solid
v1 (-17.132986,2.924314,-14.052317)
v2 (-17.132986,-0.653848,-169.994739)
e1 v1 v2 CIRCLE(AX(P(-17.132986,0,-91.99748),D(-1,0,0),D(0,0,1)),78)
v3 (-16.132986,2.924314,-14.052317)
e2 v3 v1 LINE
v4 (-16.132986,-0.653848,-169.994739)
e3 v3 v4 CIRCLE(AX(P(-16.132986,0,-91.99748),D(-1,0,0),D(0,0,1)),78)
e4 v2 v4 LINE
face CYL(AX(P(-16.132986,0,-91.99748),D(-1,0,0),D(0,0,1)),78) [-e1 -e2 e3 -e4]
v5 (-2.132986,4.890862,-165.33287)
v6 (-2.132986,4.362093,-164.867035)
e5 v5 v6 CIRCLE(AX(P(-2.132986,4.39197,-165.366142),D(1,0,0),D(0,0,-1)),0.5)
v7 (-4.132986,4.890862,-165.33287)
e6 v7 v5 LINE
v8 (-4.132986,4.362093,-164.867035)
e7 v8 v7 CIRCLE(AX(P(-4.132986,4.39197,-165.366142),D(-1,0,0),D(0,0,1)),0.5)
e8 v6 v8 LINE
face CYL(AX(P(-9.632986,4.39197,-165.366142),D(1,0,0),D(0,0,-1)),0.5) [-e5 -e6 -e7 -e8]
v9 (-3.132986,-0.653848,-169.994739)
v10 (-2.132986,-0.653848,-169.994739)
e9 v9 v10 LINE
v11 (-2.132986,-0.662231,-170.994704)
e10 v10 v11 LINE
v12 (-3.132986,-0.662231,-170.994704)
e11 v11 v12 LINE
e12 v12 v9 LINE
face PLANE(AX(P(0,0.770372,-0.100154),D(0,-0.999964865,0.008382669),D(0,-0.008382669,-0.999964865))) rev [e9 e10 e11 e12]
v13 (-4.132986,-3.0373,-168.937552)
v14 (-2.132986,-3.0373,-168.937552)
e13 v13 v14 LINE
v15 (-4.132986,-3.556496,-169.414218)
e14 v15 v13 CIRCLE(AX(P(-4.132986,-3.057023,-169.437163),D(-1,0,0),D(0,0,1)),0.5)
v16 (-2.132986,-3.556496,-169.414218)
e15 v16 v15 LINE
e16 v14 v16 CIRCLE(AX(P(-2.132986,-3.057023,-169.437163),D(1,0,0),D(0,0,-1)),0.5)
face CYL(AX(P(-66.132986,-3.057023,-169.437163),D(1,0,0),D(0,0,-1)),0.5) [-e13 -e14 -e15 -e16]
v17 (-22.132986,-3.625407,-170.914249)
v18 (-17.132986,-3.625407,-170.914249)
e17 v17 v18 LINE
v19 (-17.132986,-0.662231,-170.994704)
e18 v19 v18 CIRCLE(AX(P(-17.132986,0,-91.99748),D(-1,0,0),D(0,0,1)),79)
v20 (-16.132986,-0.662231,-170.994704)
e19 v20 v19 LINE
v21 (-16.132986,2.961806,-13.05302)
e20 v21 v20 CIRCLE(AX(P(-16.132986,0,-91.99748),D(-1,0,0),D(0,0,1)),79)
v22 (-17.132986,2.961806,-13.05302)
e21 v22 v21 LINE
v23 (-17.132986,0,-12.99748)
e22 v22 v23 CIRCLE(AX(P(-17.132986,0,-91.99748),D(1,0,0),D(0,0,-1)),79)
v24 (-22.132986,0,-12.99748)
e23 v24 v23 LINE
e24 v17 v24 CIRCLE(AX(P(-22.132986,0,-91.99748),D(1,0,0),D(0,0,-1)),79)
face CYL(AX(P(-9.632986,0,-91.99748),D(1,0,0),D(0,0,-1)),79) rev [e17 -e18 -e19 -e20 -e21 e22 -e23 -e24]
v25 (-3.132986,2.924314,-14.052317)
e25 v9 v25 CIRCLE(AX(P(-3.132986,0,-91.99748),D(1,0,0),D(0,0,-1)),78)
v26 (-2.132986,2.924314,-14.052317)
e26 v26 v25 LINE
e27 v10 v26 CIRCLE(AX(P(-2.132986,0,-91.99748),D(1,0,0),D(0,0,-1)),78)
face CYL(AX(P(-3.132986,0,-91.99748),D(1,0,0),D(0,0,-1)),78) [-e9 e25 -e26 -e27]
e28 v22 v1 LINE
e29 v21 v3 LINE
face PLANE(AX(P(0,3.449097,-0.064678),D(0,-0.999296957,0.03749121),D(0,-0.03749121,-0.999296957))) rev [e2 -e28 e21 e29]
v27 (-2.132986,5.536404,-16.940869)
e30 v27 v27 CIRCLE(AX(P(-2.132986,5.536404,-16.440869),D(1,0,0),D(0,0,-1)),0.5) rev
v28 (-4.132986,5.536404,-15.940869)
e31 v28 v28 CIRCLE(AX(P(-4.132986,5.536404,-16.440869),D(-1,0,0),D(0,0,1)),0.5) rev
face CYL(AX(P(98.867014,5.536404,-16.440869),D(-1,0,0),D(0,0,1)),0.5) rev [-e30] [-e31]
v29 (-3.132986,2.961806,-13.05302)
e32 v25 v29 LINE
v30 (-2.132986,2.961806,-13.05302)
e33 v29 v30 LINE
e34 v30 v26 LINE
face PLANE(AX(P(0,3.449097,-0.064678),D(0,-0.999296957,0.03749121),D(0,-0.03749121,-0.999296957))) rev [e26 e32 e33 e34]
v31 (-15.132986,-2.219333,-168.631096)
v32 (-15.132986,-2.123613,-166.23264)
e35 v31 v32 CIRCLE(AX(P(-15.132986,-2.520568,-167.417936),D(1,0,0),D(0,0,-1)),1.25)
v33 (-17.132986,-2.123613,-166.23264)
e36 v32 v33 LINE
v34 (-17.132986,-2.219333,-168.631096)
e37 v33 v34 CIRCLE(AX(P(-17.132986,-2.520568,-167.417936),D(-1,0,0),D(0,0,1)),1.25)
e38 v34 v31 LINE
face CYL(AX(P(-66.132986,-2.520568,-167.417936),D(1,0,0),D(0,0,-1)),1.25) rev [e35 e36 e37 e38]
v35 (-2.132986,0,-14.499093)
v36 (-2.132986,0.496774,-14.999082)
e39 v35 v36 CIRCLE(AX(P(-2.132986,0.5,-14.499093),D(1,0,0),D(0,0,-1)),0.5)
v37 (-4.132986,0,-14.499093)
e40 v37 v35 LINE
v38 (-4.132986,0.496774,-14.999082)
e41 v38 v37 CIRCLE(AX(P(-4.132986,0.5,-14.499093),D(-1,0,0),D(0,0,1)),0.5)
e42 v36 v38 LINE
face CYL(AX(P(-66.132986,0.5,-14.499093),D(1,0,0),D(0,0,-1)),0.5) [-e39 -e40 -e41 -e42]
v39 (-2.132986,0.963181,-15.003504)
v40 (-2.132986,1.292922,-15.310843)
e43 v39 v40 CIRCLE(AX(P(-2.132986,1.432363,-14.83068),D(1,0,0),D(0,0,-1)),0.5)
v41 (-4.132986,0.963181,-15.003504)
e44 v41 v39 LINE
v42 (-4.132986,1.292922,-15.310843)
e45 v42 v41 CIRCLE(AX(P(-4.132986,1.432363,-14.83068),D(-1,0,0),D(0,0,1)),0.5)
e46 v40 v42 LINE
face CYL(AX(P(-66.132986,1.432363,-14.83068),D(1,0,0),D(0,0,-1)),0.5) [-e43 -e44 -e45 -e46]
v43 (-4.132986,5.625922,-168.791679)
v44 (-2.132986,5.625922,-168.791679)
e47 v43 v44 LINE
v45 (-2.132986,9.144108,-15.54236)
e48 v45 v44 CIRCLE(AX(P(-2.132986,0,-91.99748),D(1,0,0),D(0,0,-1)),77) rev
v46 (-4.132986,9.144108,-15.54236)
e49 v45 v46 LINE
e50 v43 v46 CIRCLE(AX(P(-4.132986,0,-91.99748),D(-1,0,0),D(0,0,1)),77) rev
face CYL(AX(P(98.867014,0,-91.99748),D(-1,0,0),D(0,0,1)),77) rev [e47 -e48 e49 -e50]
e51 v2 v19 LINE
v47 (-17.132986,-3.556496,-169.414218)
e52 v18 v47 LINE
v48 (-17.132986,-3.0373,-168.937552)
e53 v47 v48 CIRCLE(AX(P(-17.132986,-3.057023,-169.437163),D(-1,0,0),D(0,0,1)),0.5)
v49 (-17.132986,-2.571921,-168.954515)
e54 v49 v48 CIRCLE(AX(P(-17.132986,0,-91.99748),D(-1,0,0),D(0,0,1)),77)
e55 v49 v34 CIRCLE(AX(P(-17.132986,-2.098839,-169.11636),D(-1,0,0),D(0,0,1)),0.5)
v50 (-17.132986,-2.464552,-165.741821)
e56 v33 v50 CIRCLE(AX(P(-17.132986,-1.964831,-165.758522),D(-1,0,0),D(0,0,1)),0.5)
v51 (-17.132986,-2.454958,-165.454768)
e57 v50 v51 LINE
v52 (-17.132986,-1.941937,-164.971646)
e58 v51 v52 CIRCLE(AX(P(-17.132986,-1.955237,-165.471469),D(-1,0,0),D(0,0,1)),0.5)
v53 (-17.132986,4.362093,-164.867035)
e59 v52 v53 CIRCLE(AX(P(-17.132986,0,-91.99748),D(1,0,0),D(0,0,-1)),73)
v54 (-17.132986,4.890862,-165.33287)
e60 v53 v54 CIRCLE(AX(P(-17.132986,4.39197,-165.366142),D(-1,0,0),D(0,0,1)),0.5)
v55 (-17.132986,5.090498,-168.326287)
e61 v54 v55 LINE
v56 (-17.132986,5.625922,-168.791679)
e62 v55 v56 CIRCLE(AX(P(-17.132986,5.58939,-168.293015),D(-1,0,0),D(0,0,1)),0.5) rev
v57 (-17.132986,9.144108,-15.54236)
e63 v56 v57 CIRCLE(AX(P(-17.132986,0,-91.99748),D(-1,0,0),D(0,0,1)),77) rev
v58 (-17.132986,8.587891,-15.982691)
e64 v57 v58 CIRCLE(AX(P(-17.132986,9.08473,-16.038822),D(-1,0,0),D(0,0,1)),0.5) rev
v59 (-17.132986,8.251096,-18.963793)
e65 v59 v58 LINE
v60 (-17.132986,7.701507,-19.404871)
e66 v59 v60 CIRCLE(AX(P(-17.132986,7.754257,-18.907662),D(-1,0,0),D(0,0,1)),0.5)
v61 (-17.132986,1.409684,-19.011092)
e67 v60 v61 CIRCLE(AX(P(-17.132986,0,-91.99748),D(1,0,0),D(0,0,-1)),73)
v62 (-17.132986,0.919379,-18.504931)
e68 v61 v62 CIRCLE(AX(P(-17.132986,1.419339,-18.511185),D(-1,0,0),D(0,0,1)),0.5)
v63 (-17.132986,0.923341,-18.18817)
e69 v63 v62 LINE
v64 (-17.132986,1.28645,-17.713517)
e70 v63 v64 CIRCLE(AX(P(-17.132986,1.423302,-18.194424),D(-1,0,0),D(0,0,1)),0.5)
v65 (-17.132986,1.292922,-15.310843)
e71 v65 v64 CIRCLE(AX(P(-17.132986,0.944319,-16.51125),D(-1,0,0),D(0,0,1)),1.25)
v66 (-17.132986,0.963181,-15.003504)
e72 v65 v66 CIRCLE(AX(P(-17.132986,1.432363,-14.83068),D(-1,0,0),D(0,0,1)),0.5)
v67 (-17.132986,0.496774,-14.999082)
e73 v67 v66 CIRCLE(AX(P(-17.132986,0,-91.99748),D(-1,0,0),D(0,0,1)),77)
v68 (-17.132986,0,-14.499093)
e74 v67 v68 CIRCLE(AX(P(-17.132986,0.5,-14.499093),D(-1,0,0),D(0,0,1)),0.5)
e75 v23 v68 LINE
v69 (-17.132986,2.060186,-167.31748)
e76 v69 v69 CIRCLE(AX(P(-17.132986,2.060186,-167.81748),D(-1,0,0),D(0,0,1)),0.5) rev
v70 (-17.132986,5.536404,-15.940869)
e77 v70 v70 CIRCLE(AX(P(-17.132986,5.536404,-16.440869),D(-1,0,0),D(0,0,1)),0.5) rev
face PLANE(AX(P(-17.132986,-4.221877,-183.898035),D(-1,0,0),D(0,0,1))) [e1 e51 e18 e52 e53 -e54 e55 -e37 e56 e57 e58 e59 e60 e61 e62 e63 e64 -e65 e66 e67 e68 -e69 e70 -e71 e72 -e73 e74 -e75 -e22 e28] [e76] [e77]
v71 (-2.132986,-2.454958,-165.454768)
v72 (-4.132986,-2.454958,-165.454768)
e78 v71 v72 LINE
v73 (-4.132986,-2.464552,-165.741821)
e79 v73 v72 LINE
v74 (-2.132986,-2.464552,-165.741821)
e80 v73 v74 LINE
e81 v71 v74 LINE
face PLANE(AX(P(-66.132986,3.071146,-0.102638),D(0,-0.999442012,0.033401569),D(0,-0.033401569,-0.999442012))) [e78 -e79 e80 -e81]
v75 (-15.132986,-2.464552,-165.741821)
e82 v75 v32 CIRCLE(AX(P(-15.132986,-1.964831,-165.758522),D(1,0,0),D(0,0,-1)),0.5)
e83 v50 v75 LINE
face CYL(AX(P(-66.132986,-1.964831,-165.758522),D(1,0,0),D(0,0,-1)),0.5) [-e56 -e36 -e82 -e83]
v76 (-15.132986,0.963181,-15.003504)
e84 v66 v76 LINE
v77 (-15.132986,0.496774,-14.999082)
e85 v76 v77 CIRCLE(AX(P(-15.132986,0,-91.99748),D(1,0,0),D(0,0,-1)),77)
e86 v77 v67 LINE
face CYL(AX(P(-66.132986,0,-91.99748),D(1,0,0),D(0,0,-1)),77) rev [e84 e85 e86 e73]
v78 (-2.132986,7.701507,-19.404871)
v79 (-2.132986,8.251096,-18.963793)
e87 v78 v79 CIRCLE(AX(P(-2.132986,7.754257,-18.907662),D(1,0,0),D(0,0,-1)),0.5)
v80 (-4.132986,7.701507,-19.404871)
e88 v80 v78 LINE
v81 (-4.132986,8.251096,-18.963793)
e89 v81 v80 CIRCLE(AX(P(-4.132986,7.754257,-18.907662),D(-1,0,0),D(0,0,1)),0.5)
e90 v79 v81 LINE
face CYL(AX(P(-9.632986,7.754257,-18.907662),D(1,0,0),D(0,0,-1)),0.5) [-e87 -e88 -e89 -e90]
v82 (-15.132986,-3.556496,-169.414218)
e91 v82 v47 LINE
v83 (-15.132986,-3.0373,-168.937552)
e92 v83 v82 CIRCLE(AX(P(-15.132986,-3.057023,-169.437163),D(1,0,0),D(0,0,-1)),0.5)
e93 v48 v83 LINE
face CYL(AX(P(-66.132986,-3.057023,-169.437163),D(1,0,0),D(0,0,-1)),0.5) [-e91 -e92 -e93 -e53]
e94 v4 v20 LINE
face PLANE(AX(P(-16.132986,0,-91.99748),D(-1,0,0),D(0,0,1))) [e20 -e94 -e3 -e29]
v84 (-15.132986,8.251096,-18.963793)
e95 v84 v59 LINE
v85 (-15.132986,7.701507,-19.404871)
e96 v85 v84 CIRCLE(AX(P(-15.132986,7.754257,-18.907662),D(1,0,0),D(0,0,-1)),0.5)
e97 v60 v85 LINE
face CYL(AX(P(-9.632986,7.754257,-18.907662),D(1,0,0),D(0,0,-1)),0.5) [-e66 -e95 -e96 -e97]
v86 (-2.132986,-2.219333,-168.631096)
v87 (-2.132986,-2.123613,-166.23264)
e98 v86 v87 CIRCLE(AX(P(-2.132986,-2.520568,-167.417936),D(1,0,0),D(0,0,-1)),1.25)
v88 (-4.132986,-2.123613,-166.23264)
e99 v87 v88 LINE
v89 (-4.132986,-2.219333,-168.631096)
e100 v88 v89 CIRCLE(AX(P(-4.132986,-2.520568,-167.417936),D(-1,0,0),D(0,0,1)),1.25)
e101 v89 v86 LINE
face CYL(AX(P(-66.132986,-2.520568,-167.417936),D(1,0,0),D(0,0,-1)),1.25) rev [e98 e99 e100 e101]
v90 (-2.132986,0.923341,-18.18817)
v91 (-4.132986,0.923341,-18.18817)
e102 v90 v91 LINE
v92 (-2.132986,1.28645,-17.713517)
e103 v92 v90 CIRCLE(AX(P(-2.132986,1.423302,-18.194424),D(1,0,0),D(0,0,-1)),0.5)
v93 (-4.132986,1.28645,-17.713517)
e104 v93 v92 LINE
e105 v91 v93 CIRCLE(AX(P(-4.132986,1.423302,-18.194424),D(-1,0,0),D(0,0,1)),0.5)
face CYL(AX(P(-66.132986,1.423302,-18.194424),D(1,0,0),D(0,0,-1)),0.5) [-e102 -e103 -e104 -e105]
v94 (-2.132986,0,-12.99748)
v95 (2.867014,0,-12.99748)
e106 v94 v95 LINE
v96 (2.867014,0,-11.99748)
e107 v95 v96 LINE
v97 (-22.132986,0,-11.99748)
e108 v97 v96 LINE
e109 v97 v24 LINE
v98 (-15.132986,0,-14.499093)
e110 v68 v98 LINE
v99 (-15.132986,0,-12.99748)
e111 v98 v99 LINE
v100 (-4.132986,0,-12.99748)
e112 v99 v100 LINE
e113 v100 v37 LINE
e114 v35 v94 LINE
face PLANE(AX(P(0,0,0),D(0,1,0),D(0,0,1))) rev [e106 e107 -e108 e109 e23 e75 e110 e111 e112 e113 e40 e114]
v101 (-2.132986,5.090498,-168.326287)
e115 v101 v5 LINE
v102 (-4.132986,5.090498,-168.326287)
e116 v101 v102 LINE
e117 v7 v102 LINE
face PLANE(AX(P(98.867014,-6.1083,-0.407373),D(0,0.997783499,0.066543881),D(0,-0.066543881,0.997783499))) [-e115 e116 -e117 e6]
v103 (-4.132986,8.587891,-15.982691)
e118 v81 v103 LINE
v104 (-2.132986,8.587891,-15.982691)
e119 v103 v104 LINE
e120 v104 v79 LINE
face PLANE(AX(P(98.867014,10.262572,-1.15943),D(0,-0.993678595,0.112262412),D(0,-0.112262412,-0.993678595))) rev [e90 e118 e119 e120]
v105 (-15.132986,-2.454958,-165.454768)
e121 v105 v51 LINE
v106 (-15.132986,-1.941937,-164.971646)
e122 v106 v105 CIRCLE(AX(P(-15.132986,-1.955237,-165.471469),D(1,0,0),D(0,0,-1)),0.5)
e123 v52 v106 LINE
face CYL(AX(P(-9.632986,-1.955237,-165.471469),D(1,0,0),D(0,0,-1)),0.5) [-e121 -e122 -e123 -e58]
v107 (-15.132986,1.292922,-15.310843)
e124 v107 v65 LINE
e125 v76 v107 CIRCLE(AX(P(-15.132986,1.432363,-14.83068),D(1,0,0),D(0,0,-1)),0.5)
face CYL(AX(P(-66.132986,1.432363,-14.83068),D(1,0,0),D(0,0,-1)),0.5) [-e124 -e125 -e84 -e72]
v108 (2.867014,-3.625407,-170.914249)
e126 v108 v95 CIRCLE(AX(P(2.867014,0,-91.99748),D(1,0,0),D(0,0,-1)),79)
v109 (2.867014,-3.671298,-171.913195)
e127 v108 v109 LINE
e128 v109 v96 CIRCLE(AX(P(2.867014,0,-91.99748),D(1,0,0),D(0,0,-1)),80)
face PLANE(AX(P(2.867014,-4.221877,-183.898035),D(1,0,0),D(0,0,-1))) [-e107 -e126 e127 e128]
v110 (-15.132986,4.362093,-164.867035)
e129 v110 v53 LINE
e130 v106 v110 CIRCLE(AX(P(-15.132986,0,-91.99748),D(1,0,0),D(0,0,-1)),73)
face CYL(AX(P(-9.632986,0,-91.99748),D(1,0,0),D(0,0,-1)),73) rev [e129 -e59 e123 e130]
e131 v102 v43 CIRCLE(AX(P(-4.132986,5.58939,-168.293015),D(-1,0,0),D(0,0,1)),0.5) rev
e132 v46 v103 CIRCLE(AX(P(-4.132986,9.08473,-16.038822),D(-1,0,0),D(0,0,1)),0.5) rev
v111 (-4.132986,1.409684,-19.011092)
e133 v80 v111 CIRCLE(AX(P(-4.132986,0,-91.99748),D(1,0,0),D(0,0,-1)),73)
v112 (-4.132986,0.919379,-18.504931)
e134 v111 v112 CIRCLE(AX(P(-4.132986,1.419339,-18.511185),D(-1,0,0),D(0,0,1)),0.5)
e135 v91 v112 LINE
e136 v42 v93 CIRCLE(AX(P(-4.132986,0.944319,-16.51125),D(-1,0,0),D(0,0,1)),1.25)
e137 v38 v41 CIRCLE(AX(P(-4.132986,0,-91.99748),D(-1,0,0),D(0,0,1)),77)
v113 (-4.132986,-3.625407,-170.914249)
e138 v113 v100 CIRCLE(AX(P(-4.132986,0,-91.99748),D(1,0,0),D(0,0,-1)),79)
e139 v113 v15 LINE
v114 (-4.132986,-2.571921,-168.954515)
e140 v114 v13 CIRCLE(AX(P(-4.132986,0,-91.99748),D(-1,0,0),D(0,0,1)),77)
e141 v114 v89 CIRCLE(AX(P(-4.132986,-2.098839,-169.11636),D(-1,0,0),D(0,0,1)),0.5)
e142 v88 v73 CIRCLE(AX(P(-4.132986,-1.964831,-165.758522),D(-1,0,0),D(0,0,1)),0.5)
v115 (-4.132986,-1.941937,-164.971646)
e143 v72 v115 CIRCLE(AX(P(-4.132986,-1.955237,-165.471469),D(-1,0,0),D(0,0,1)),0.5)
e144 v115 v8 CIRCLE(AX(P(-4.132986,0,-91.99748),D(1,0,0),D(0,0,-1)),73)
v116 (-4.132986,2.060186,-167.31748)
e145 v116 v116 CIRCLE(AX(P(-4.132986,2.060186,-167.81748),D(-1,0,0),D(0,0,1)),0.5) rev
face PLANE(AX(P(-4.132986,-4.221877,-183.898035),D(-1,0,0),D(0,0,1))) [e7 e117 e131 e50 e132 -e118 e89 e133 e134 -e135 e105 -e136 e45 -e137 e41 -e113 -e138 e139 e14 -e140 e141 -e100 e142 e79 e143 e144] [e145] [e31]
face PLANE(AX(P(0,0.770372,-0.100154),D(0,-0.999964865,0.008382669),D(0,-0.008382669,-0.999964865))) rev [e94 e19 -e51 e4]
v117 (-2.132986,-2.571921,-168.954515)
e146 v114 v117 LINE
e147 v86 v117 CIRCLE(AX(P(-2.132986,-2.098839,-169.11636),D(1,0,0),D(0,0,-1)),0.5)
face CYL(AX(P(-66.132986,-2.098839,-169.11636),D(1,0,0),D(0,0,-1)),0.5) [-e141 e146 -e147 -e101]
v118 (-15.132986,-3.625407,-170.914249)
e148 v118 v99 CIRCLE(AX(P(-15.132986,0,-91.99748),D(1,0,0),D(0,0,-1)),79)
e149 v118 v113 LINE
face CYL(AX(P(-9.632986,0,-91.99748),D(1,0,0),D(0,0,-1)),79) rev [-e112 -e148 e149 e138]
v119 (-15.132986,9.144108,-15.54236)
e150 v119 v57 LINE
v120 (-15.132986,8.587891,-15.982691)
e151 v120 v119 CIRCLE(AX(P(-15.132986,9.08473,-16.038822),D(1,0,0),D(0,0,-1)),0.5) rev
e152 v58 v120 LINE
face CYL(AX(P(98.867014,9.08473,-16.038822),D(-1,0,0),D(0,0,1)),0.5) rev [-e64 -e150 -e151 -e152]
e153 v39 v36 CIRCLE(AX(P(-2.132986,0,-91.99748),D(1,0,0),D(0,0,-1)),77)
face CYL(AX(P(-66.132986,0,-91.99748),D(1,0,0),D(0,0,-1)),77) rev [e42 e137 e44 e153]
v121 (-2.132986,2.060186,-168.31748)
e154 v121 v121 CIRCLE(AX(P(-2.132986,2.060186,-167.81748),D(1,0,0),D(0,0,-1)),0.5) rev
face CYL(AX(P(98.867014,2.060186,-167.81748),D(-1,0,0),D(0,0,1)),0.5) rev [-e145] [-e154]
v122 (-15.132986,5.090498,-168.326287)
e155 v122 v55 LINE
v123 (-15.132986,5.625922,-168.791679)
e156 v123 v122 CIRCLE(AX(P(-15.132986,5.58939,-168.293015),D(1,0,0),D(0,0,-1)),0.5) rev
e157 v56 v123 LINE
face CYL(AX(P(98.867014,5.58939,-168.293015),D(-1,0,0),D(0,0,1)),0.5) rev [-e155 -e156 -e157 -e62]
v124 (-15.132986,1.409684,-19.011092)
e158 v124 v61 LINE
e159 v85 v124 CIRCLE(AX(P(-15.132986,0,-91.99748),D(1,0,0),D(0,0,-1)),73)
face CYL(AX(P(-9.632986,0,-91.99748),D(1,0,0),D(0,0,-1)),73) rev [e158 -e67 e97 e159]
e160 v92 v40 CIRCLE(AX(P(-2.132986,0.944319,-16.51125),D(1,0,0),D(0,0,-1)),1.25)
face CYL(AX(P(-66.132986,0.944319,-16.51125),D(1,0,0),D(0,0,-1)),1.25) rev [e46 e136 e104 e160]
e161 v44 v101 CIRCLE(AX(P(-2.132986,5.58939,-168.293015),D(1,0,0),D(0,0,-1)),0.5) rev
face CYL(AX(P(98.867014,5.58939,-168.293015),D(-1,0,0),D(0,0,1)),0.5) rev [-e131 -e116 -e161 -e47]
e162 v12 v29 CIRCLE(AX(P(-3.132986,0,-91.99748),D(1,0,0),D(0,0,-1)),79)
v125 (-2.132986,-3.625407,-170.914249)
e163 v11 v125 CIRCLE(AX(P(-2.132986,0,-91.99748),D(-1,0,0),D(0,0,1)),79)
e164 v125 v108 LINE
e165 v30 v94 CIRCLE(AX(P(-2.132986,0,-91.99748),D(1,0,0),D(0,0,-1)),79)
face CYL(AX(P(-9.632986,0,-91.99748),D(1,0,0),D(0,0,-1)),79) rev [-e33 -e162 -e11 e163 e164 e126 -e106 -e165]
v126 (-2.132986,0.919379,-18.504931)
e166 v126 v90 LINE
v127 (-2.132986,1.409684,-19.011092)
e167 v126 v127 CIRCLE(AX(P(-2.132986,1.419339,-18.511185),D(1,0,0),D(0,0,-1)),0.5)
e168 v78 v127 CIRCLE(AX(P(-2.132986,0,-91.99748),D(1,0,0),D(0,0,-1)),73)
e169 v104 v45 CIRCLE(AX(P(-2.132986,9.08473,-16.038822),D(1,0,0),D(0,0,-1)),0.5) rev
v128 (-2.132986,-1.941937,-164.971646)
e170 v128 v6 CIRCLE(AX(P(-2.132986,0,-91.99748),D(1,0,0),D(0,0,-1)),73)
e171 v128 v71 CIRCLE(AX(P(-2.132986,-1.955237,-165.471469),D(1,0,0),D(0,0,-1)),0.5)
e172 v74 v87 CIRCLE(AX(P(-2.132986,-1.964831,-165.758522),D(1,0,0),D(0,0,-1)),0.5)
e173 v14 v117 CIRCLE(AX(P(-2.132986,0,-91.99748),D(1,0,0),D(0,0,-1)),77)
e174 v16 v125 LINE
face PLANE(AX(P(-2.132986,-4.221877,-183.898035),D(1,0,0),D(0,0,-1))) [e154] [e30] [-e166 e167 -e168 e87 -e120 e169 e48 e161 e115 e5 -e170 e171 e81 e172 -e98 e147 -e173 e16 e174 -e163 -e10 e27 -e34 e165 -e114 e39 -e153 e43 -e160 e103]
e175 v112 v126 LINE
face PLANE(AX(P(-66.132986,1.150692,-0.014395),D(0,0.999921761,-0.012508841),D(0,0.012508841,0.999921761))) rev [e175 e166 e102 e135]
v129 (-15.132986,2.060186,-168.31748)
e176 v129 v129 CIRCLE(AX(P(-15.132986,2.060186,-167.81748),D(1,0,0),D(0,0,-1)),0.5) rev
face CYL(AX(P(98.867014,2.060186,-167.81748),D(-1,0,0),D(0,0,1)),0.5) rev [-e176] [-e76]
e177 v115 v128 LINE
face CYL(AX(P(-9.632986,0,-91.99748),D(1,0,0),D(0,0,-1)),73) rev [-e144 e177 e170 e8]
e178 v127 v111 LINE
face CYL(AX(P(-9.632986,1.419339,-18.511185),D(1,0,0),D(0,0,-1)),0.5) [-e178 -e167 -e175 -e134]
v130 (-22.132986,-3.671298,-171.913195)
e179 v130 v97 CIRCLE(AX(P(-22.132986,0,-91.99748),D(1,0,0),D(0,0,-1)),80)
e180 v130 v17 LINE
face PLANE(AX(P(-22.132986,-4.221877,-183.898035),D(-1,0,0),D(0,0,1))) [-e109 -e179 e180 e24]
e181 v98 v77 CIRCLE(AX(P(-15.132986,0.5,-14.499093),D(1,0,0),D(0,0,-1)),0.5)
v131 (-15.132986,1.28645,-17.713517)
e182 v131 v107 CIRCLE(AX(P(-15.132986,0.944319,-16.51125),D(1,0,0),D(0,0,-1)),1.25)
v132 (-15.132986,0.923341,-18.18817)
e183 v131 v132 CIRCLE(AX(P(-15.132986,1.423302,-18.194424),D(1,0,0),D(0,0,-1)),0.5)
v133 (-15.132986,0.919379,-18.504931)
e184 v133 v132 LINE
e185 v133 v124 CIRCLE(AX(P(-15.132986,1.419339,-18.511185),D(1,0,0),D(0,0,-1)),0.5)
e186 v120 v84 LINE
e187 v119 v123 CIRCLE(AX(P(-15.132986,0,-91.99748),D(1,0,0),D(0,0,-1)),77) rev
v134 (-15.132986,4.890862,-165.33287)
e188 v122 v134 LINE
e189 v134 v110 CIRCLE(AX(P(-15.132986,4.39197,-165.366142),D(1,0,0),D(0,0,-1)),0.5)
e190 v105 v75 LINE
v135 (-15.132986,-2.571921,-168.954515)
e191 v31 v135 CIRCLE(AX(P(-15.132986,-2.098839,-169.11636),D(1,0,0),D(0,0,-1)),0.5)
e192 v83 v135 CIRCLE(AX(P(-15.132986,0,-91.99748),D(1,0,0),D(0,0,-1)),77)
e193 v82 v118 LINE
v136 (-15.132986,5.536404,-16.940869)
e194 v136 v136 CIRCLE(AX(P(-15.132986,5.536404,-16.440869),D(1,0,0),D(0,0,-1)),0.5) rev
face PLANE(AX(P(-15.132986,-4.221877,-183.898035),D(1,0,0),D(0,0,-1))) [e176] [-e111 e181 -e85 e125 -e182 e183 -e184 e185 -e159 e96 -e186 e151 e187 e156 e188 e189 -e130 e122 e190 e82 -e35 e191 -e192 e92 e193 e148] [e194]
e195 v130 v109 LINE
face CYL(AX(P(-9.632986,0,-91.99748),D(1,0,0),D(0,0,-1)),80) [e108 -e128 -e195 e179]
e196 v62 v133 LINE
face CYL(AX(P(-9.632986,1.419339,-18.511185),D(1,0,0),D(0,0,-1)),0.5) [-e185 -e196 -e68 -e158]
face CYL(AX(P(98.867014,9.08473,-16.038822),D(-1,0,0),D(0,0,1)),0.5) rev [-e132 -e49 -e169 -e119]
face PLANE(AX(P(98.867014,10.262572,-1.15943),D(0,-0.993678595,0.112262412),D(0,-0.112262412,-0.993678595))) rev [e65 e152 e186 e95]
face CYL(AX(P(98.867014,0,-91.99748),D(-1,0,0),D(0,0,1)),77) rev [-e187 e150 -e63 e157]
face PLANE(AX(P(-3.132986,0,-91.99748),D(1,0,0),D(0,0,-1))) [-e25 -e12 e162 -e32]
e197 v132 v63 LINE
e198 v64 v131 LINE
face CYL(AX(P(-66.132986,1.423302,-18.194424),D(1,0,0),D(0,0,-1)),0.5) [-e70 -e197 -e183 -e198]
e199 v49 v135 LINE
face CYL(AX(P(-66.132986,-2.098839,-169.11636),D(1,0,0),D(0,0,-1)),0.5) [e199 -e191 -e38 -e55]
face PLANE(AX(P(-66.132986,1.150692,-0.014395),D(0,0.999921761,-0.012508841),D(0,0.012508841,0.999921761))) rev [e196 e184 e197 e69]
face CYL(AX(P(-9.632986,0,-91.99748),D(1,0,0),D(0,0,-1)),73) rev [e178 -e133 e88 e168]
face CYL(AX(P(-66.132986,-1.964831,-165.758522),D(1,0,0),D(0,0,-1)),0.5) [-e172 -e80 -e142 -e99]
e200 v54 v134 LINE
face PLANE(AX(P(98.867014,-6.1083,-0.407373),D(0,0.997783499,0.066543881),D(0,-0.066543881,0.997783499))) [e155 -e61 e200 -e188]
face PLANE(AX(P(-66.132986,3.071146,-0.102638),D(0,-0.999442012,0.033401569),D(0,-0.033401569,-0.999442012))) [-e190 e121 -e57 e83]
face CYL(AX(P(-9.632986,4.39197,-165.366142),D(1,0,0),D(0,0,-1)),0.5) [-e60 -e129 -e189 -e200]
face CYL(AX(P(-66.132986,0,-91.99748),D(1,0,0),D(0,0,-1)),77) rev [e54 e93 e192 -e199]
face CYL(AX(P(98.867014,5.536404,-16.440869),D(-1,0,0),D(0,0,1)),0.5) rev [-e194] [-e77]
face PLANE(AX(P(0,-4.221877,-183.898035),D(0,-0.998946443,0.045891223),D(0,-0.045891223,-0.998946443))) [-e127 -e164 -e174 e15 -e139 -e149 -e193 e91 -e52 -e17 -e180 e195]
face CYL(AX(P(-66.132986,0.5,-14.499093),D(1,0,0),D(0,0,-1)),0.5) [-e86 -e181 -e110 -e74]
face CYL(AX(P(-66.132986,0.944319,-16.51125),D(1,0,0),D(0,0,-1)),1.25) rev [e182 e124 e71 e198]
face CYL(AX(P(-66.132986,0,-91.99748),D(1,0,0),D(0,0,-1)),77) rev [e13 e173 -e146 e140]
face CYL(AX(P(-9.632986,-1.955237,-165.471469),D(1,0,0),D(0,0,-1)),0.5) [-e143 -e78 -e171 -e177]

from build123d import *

# Parameters (mm, degrees)
CROQUIS2_W                 = 2
CROQUIS2_H                 = 6
REVOLUCI_N1_ANGLE          = 182.6302972
CORTAR_EXTRUIR2_DEPTH      = 101
CORTAR_EXTRUIR2_DEPTH_BACK = 64
CROQUIS3_R                 = 0.5
REDONDEO1_R                = 0.5
REDONDEO2_R                = 0.5
CORTAR_EXTRUIR4_START      = -1
CROQUIS5_R                 = 79
CROQUIS5_R_2               = 78
CORTAR_EXTRUIR4_DEPTH      = 1
CROQUIS6_R                 = 79
CROQUIS6_R_2               = 78
CORTAR_EXTRUIR5_DEPTH      = 1
CROQUIS7_W                 = 1
CROQUIS7_H                 = 1
REVOLUCI_N2_ANGLE          = 2.14859164
CROQUIS8_W                 = 1
CROQUIS8_H                 = 1
REVOLUCI_N4_ANGLE          = 2.15


with BuildPart() as part:
    # Croquis2 → Revolución1 (revolve)
    with BuildSketch(Plane(origin=(0, 0, 0), x_dir=(1, 0, 0), z_dir=(0, 1, 0))):
        Polygon((-9.632985998, 12.997479648), (-9.632985998, 11.997479648), (2.867014002, 11.997479648), (2.867014002, 12.997479648), (-2.132985998, 12.997479648), (-4.132985998, 12.997479648), align=None)
        Polygon((-22.132985998, 12.997479648), (-22.132985998, 11.997479648), (-9.632985998, 11.997479648), (-9.632985998, 12.997479648), (-15.132985998, 12.997479648), (-17.132985998, 12.997479648), align=None)
        with Locations((-16.132985998, 15.997479648)):
            Rectangle(CROQUIS2_W, CROQUIS2_H)
        with Locations((-3.132985998, 15.997479648)):
            Rectangle(CROQUIS2_W, CROQUIS2_H)
    revolve(axis=Axis((-9.632985998, 0, -91.997479648), (-1, 0, 0)), revolution_arc=REVOLUCI_N1_ANGLE)

    # Croquis3 → Cortar-Extruir2 (cut, two sides: drawn at the far end of the back side and taken through both)
    with BuildSketch(Plane(origin=(-2.132985998, 0, 0), x_dir=(0, 0, -1), z_dir=(1, 0, 0)).offset(-CORTAR_EXTRUIR2_DEPTH_BACK)):
        with BuildLine():
            ThreePointArc((168.916355745, -3.533624195), (168.93693777, -3.052832115), (168.954514567, -2.571920792))
            Line((168.954514567, -2.571920792), (168.667238596, -2.562319967))
            ThreePointArc((168.667238596, -2.562319967), (167.459688042, -1.271265491), (166.168633566, -2.478816045))
            Line((166.168633566, -2.478816045), (164.956746519, -2.438314517))
            ThreePointArc((164.956746519, -2.438314517), (164.940082803, -2.894243433), (164.920569974, -3.350059302))
            Line((164.920569974, -3.350059302), (168.916355745, -3.533624195))
        make_face()
        with BuildLine():
            ThreePointArc((15.003504022, 0.963180773), (14.998985756, 0.481599807), (14.997479648, 0))
            Line((14.997479648, 0), (18.997479648, 0))
            ThreePointArc((18.997479648, 0), (18.998907517, 0.456581635), (19.003191067, 0.913145409))
            Line((19.003191067, 0.913145409), (17.761151954, 0.928683094))
            ThreePointArc((17.761151954, 0.928683094), (16.526885803, 2.194221348), (15.26134755, 0.959955197))
            Line((15.26134755, 0.959955197), (15.003504022, 0.963180773))
        make_face()
        with Locations(Location((167.817479648, 2.060185692, 0), (0, 0, 180))):
            Circle(CROQUIS3_R)
        with Locations(Location((16.440869241, 5.536404348, 0), (0, 0, 180))):
            Circle(CROQUIS3_R)
        with BuildLine():
            ThreePointArc((168.826809108, 5.123878873), (93.764723702, 76.979717124), (15.484227806, 8.644205721))
            Line((15.484227806, 8.644205721), (19.458942188, 8.195156073))
            ThreePointArc((19.458942188, 8.195156073), (93.672918816, 72.98077078), (164.835675111, 4.857703347))
            Line((164.835675111, 4.857703347), (168.826809108, 5.123878873))
        make_face()
    extrude(amount=CORTAR_EXTRUIR2_DEPTH + CORTAR_EXTRUIR2_DEPTH_BACK, mode=Mode.SUBTRACT)

    # Redondeo1
    # the kernel refuses this fillet: 0.5 mm, written as the material it adds along each edge
    with BuildSketch(Plane(origin=(-17.132985998, 5.123878873, -168.826809108), x_dir=(0, -0.06654388147144101, 0.9977834994820844), z_dir=(1, 0, 0)), Plane(origin=(-4.132985998, 5.123878873, -168.826809108), x_dir=(0, -0.06654388147144101, 0.9977834994820844), z_dir=(1, 0, 0))) as redondeo1_piece_1:
        with BuildLine():
            CenterArc((0.501634004, -0.5), REDONDEO1_R, 90, 90.374484885)
            ThreePointArc((0.001644684, -0.503267974), (0.000411172, -0.251635331), (0, 0))
            Line((0, 0), (0.501634004, 0))
        make_face()
    extrude(amount=2)
    # the kernel refuses this fillet: 0.5 mm, written as the material it takes off along each edge
    with BuildSketch(Plane(origin=(-18.378734248, 4.857703347, -164.835675111), x_dir=(0, -0.9980040686356455, -0.06314965547568487), z_dir=(1, 0, 0)), Plane(origin=(-5.378734248, 4.857703347, -164.835675111), x_dir=(0, -0.9980040686356455, -0.06314965547568487), z_dir=(1, 0, 0))) as redondeo1_2_piece_1:
        with BuildLine():
            CenterArc((0.498302202, 0.499997108), REDONDEO1_R, 180.194885107, 89.610229786)
            Line((-0.001694905, 0.498296418), (0, 0))
            ThreePointArc((0, 0), (0.248300756, 0.000422284), (0.496601512, 0))
        make_face()
    extrude(amount=4.4914965, mode=Mode.SUBTRACT)
    with BuildSketch(Plane(origin=(-5.378953698, -3.533624195, -168.916355745), x_dir=(0, -0.045891223305881, -0.9989464428203795), z_dir=(1, 0, 0)), Plane(origin=(-18.378953698, -3.533624195, -168.916355745), x_dir=(0, -0.045891223305881, -0.9989464428203795), z_dir=(1, 0, 0))) as redondeo1_2_piece_2:
        with BuildLine():
            CenterArc((0.49838708, 0.5), REDONDEO1_R, 180.369652755, 89.630347245)
            ThreePointArc((-0.001602514, 0.496774194), (-0.00040063, 0.248388389), (0, 0))
            Line((0, 0), (0.49838708, 0))
        make_face()
    extrude(amount=4.4919354, mode=Mode.SUBTRACT)
    with BuildSketch(Plane(origin=(-14.06535854, -2.478816045, -166.168633566), x_dir=(0, 0.9841495238599837, -0.17734067408851076), z_dir=(-1, 0, 0)), Plane(origin=(-1.06535854, -2.478816045, -166.168633566), x_dir=(0, 0.9841495238599838, -0.17734067408851054), z_dir=(-1, 0, 0))) as redondeo1_2_piece_3:
        with BuildLine():
            CenterArc((0.433108746, -0.494761918), REDONDEO1_R, 98.3007748, 73.398450401)
            Line((-0.061653172, -0.422577127), (0, 0))
            ThreePointArc((0, 0), (0.180461978, -0.013095204), (0.360923955, 0))
        make_face()
    extrude(amount=4.135254916, mode=Mode.SUBTRACT)
    with BuildSketch(Plane(origin=(-17.995200064, -2.562319967, -168.667238596), x_dir=(0, -0.033401568724359246, -0.9994420119280317), z_dir=(1, 0, 0)), Plane(origin=(-4.995200064, -2.562319967, -168.667238596), x_dir=(0, -0.033401568724359246, -0.9994420119280317), z_dir=(1, 0, 0))) as redondeo1_2_piece_4:
        with BuildLine():
            CenterArc((0.433390187, 0.478223253), REDONDEO1_R, 195.858969576, 57.168831014)
            ThreePointArc((-0.047578438, 0.341588038), (-0.011951747, 0.172442813), (0, 0))
            Line((0, 0), (0.287436357, 0))
        make_face()
    extrude(amount=3.724428132, mode=Mode.SUBTRACT)
    with BuildSketch(Plane(origin=(-13.887237748, -2.438314517, -164.956746519), x_dir=(0, -0.03340156872588579, -0.9994420119279808), z_dir=(-1, 0, 0)), Plane(origin=(-0.887237748, -2.438314517, -164.956746519), x_dir=(0, -0.03340156872588579, -0.9994420119279808), z_dir=(-1, 0, 0))) as redondeo1_2_piece_5:
        with BuildLine():
            CenterArc((0.4982993, -0.5), REDONDEO1_R, 90, 89.610229786)
            ThreePointArc((-0.001689131, -0.496598639), (-0.000422284, -0.248300756), (0, 0))
            Line((0, 0), (0.4982993, 0))
        make_face()
    extrude(amount=4.4914965, mode=Mode.SUBTRACT)

    # Redondeo2
    # the kernel refuses this fillet: 0.5 mm, written as the material it adds along each edge
    with BuildSketch(Plane(origin=(-15.132985998, 8.644205721, -15.484227806), x_dir=(0, 0.9933064166232053, -0.11550914550444648), z_dir=(-1, 0, 0)), Plane(origin=(-2.132985998, 8.644205721, -15.484227806), x_dir=(0, 0.9933064166232053, -0.11550914550444648), z_dir=(-1, 0, 0))) as redondeo2_piece_1:
        with BuildLine():
            CenterArc((0.501636666, 0.49999733), REDONDEO2_R, 179.812757557, 90.374484885)
            Line((0.001639336, 0.501631326), (0, 0))
            ThreePointArc((0, 0), (0.251635331, -0.000411172), (0.503270661, 0))
        make_face()
    extrude(amount=2)
    # the kernel refuses this fillet: 0.5 mm, written as the material it takes off along each edge
    with BuildSketch(Plane(origin=(-5.378953698, 0, -14.997479648), x_dir=(0, 0, 1), z_dir=(1, 0, 0)), Plane(origin=(-18.378953698, 0, -14.997479648), x_dir=(0, 0, 1), z_dir=(1, 0, 0))) as redondeo2_2_piece_1:
        with BuildLine():
            CenterArc((0.49838708, -0.5), REDONDEO2_R, 90, 89.630347245)
            ThreePointArc((-0.001602514, -0.496774194), (-0.00040063, -0.248388389), (0, 0))
            Line((0, 0), (0.49838708, 0))
        make_face()
    extrude(amount=4.4919354, mode=Mode.SUBTRACT)
    with BuildSketch(Plane(origin=(-14.291422485, 0.959955197, -15.26134755), x_dir=(0, 0.0125088412135749, 0.9999217613851065), z_dir=(-1, 0, 0))) as redondeo2_2_piece_2:
        with BuildLine():
            CenterArc((0.436542668, 0.466983755), REDONDEO2_R, 195.476781903, 53.585192252)
            ThreePointArc((-0.045326665, 0.333559825), (-0.0113835, 0.168312703), (0, 0))
            Line((0, 0), (0.257863703, 0))
        make_face()
    extrude(amount=3.683127026, mode=Mode.SUBTRACT)
    with BuildSketch(Plane(origin=(-14.06535854, 0.928683094, -17.761151954), x_dir=(0, 0.9912523140828179, 0.13198049032133008), z_dir=(-1, 0, 0))) as redondeo2_2_piece_3:
        with BuildLine():
            CenterArc((0.433108746, 0.494761918), REDONDEO2_R, 188.300774799, 73.398450401)
            Line((-0.061653172, 0.422577127), (0, 0))
            ThreePointArc((0, 0), (0.180461978, 0.013095204), (0.360923955, 0))
        make_face()
    extrude(amount=4.135254916, mode=Mode.SUBTRACT)
    with BuildSketch(Plane(origin=(-13.887237748, 0.913145409, -19.003191067), x_dir=(0, 0.012508841212886753, 0.9999217613851149), z_dir=(-1, 0, 0))) as redondeo2_2_piece_4:
        with BuildLine():
            CenterArc((0.4982993, 0.5), REDONDEO2_R, 180.389770214, 89.610229786)
            ThreePointArc((-0.001689131, 0.496598639), (-0.000422284, 0.248300756), (0, 0))
            Line((0, 0), (0.4982993, 0))
        make_face()
    extrude(amount=4.4914965, mode=Mode.SUBTRACT)
    with BuildSketch(Plane(origin=(-1.291422485, 0.959955197, -15.26134755), x_dir=(0, 0.9891313564110952, -0.1470345529606798), z_dir=(-1, 0, 0))) as redondeo2_2_piece_5:
        with BuildLine():
            CenterArc((0.403950486, -0.4954466), REDONDEO2_R, 97.738390952, 53.585192252)
            Line((-0.034721389, -0.25551539), (0, 0))
            ThreePointArc((0, 0), (0.168312703, -0.0113835), (0.336625405, 0))
        make_face()
    extrude(amount=3.683127026, mode=Mode.SUBTRACT)
    with BuildSketch(Plane(origin=(-1.06535854, 0.928683094, -17.761151954), x_dir=(0, -0.012508841213102863, -0.9999217613851122), z_dir=(-1, 0, 0))) as redondeo2_2_piece_6:
        with BuildLine():
            CenterArc((0.427050983, -0.5), REDONDEO2_R, 90, 73.398450401)
            ThreePointArc((-0.052106441, -0.357142857), (-0.013095204, -0.180461978), (0, 0))
            Line((0, 0), (0.427050983, 0))
        make_face()
    extrude(amount=4.135254916, mode=Mode.SUBTRACT)
    with BuildSketch(Plane(origin=(-0.887237748, 0.913145409, -19.003191067), x_dir=(0, 0.9998734298021862, -0.015909882954082417), z_dir=(-1, 0, 0))) as redondeo2_2_piece_7:
        with BuildLine():
            CenterArc((0.498302202, -0.499997108), REDONDEO2_R, 90.194885107, 89.610229786)
            Line((-0.001694905, -0.498296418), (0, 0))
            ThreePointArc((0, 0), (0.248300756, -0.000422284), (0.496601512, 0))
        make_face()
    extrude(amount=4.4914965, mode=Mode.SUBTRACT)
    with BuildSketch(Plane(origin=(-13.887237748, 8.195156073, -19.458942188), x_dir=(0, -0.9940546943563762, 0.10888188383772368), z_dir=(-1, 0, 0))) as redondeo2_2_piece_8:
        with BuildLine():
            CenterArc((0.498302202, 0.499997108), REDONDEO2_R, 180.194885107, 89.610229786)
            Line((-0.001694905, 0.498296418), (0, 0))
            ThreePointArc((0, 0), (0.248300756, 0.000422284), (0.496601512, 0))
        make_face()
    extrude(amount=4.4914965, mode=Mode.SUBTRACT)
    with BuildSketch(Plane(origin=(-0.887237748, 8.195156073, -19.458942188), x_dir=(0, 0.11226241196204409, 0.9936785953518695), z_dir=(-1, 0, 0))) as redondeo2_2_piece_9:
        with BuildLine():
            CenterArc((0.4982993, -0.5), REDONDEO2_R, 90, 89.610229786)
            ThreePointArc((-0.001689131, -0.496598639), (-0.000422284, -0.248300756), (0, 0))
            Line((0, 0), (0.4982993, 0))
        make_face()
    extrude(amount=4.4914965, mode=Mode.SUBTRACT)

    # Croquis5 → Cortar-Extruir4 (cut)
    with BuildSketch(Plane(origin=(-2.132985998, 0, 0), x_dir=(0, 0, -1), z_dir=(1, 0, 0)).offset(CORTAR_EXTRUIR4_START)):
        with Locations((91.997479648, 0)):
            Circle(CROQUIS5_R)
        with Locations((91.997479648, 0)):
            Circle(CROQUIS5_R_2, mode=Mode.SUBTRACT)
    extrude(amount=CORTAR_EXTRUIR4_DEPTH, mode=Mode.SUBTRACT)

    # Croquis6 → Cortar-Extruir5 (cut)
    with BuildSketch(Plane.ZY.offset(17.132985998)):
        with Locations((-91.997479648, 0)):
            Circle(CROQUIS6_R)
        with Locations((-91.997479648, 0)):
            Circle(CROQUIS6_R_2, mode=Mode.SUBTRACT)
    extrude(amount=-CORTAR_EXTRUIR5_DEPTH, mode=Mode.SUBTRACT)

    # Croquis7 → Revolución2 (revolve)
    with BuildSketch(Plane.XZ):
        with Locations((-16.632985998, -13.497479648)):
            Rectangle(CROQUIS7_W, CROQUIS7_H)
        with Locations((-2.632985998, -13.497479648)):
            Rectangle(CROQUIS7_W, CROQUIS7_H)
    revolve(axis=Axis((-9.632985998, 0, -91.997479648), (-1, 0, 0)), revolution_arc=REVOLUCI_N2_ANGLE)

    # Croquis8 → Revolución4 (revolve)
    with BuildSketch(Plane(origin=(0, 4.217428894, -0.193747095), x_dir=(1, 0, 0), z_dir=(0, -0.9989464428202578, 0.04589122330853027))):
        with Locations((-16.632985998, -170.400555043)):
            Rectangle(CROQUIS8_W, CROQUIS8_H)
        with Locations((-2.632985998, -170.400555043)):
            Rectangle(CROQUIS8_W, CROQUIS8_H)
    revolve(axis=Axis((-9.632985998, 0, -91.997479648), (1, 0, 0)), revolution_arc=REVOLUCI_N4_ANGLE)


solid = part.part
